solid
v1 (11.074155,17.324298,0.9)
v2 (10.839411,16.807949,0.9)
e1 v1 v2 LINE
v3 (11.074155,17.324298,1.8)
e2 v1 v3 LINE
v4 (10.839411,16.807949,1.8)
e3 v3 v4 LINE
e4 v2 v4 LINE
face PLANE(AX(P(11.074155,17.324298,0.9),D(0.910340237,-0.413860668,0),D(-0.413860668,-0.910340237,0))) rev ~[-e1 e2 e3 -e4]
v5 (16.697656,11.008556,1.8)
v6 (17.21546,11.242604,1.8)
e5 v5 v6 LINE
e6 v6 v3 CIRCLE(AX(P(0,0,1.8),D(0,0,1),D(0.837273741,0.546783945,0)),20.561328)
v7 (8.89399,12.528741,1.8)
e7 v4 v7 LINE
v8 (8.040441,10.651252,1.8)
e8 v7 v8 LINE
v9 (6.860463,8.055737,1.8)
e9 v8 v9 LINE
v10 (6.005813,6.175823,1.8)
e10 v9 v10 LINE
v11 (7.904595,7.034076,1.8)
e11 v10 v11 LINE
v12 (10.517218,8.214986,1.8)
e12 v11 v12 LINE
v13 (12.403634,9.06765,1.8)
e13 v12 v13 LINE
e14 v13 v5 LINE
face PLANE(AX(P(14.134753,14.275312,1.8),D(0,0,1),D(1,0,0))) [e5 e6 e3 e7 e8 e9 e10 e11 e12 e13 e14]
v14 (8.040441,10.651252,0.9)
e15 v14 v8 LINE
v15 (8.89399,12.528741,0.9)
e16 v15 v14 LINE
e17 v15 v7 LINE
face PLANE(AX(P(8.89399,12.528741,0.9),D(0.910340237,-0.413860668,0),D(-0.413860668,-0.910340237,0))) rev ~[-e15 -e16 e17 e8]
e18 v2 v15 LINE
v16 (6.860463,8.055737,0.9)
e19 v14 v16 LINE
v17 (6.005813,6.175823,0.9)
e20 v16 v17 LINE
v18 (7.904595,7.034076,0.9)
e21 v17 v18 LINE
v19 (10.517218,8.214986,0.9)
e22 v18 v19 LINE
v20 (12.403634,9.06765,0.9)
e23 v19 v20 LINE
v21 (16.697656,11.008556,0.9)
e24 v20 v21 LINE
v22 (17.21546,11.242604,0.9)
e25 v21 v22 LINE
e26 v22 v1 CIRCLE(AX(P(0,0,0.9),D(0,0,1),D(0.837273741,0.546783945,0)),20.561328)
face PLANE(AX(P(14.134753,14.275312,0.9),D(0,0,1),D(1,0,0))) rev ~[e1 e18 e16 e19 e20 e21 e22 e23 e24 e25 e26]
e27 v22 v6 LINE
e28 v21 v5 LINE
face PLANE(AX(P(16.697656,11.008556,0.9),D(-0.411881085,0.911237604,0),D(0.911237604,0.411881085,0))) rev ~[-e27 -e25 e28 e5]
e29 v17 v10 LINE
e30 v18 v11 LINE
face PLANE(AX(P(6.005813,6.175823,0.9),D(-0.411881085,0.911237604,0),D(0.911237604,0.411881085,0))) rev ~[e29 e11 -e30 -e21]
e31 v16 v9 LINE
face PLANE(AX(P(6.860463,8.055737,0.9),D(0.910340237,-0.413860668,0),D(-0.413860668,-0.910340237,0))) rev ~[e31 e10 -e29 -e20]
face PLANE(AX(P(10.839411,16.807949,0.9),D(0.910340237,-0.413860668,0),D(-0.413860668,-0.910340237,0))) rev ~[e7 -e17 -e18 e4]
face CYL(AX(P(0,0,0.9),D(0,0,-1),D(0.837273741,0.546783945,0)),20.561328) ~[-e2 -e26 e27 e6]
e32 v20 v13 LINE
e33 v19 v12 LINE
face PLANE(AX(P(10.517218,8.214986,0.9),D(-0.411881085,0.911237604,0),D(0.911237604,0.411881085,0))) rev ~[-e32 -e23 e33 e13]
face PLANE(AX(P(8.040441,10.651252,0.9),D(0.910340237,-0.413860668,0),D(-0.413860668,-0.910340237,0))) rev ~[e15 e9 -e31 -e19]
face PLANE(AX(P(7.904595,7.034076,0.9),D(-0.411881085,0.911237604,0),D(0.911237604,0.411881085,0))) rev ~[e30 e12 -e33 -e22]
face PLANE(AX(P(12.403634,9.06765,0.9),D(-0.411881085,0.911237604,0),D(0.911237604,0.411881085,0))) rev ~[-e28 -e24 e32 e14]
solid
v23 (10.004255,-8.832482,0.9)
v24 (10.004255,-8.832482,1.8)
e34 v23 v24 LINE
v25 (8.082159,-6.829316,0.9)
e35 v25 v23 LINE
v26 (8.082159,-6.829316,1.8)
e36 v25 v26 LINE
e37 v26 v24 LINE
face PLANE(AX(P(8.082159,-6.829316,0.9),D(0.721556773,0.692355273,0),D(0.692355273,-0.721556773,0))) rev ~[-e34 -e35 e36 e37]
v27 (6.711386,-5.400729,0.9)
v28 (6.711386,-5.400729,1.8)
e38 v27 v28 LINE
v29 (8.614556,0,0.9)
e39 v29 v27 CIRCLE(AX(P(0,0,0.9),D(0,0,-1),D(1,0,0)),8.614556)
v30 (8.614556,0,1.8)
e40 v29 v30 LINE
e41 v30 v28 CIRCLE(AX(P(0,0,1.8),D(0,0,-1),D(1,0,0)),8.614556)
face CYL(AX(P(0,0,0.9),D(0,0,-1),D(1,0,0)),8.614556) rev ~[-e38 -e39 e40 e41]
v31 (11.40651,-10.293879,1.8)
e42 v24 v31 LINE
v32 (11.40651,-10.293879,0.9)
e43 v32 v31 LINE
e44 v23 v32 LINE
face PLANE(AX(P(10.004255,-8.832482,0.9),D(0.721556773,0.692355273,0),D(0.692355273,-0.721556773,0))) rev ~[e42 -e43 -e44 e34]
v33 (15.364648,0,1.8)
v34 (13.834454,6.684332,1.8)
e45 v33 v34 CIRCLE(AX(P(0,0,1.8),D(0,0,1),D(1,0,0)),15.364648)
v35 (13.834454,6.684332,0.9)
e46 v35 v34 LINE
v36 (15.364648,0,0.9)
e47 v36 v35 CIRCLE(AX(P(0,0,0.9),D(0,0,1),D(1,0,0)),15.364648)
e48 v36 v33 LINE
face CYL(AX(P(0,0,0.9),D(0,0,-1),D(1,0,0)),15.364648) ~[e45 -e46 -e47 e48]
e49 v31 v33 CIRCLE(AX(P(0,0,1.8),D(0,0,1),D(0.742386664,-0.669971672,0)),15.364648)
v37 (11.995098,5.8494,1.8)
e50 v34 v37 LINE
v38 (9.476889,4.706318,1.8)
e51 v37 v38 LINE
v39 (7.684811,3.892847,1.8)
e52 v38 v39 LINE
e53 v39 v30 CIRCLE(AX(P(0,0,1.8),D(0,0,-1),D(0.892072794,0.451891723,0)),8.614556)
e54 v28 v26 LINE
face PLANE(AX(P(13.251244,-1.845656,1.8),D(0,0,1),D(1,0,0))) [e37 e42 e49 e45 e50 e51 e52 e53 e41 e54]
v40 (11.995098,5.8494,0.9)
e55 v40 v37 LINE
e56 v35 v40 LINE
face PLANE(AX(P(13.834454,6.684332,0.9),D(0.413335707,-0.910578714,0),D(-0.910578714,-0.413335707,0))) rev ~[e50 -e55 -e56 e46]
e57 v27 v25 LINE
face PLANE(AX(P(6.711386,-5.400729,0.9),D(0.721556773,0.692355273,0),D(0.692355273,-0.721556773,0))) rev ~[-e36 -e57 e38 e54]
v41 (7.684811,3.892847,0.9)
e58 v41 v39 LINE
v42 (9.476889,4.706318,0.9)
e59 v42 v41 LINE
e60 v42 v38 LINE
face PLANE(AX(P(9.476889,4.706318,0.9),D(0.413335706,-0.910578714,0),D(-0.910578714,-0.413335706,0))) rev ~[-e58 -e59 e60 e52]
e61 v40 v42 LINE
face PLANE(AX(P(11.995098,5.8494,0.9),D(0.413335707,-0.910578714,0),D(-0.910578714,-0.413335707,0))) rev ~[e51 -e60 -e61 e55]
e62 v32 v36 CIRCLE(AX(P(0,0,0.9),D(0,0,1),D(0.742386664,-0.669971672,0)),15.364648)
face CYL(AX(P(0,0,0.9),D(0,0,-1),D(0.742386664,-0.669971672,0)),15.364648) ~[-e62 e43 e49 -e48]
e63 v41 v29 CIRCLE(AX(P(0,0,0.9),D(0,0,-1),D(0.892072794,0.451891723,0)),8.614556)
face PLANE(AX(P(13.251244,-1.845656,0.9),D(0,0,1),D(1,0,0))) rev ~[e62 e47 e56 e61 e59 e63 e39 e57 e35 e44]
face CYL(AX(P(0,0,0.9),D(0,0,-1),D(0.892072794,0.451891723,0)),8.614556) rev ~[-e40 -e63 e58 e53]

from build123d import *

# Parameters (mm, degrees)
F0_R        = 1.5044645314
F1_DEPTH    = 2.7
F2_DEPTH    = 0.9
F3_DEPTH    = 2.7
F4_DEPTH    = 0.9
F5_T1_DEPTH = 2.7
F6_DEPTH    = 0.9


# Not quite as in the source:
# - a fillet or chamfer that OpenCascade refuses, or shapes differently, is made with other operations: its cross-section is extruded or revolved along the edge and cut away or added


with BuildPart() as f1:
    # F0 (on Top) → F1 (new body)
    with BuildSketch(Plane.XY):
        with BuildLine():
            ThreePointArc((-2.9059050305, 19.7877668258), (-18.361479671, -7.928181651), (12.4102011034, -15.6839697964))
            Line((12.4102011034, -15.6839697964), (9.3065271924, -12.2254227754))
            ThreePointArc((9.3065271924, -12.2254227754), (-15.2699304913, -1.7034180964), (6.3836906961, 13.9757255095))
            Line((6.3836906961, 13.9757255095), (8.1864677167, 18.2477874364))
            ThreePointArc((8.1864677167, 18.2477874364), (5.5993809855, 19.2001805351), (2.9059050305, 19.7877668258))
            ThreePointArc((2.9059050305, 19.7877668258), (0, 18.1241204417), (-2.9059050305, 19.7877668258))
        make_face()
        with BuildLine():
            ThreePointArc((6.3836906961, 13.9757255095), (-15.2699304913, -1.7034180964), (9.3065271924, -12.2254227754))
            Line((9.3065271924, -12.2254227754), (7.9527661976, -10.7168731694))
            ThreePointArc((7.9527661976, -10.7168731694), (-13.2749249311, -1.3690247612), (5.5982117915, 12.114366903))
            Line((5.5982117915, 12.114366903), (6.3836906961, 13.9757255095))
        make_face()
        with BuildLine():
            ThreePointArc((5.5982117915, 12.114366903), (-13.2749249311, -1.3690247612), (7.9527661976, -10.7168731694))
            Line((7.9527661976, -10.7168731694), (6.0964799797, -8.6483397626))
            ThreePointArc((6.0964799797, -8.6483397626), (-10.5418803683, -0.9108276969), (4.5227579261, 9.5658512185))
            Line((4.5227579261, 9.5658512185), (5.5982117915, 12.114366903))
        make_face()
        with BuildLine():
            ThreePointArc((4.5227579261, 9.5658512185), (-10.5418803683, -0.9108276969), (6.0964799797, -8.6483397626))
            Line((6.0964799797, -8.6483397626), (4.7718042528, -7.1722010249))
            ThreePointArc((4.7718042528, -7.1722010249), (-8.5947223482, -0.5842355063), (3.7573171653, 7.7519772374))
            Line((3.7573171653, 7.7519772374), (4.5227579261, 9.5658512185))
        make_face()
        with BuildLine():
            ThreePointArc((3.7573171653, 7.7519772374), (-8.5947223482, -0.5842355063), (4.7718042528, -7.1722010249))
            Line((4.7718042528, -7.1722010249), (1.6593857385, -3.7039095455))
            ThreePointArc((1.6593857385, -3.7039095455), (-4.0546444127, 0.1799045205), (1.9809039535, 3.5423899386))
            Line((1.9809039535, 3.5423899386), (3.7573171653, 7.7519772374))
        make_face()
        with BuildLine():
            ThreePointArc((2.9059050305, 19.7877668258), (0, 20), (-2.9059050305, 19.7877668258))
            ThreePointArc((-2.9059050305, 19.7877668258), (0, 18.1241204417), (2.9059050305, 19.7877668258))
        make_face()
        with BuildLine():
            ThreePointArc((-3.157685128, 20.3174125427), (-3.043339046, 20.0471019762), (-2.9059050305, 19.7877668258))
            ThreePointArc((-2.9059050305, 19.7877668258), (0, 20), (2.9059050305, 19.7877668258))
            ThreePointArc((2.9059050305, 19.7877668258), (3.043339046, 20.0471019762), (3.157685128, 20.3174125427))
            ThreePointArc((3.157685128, 20.3174125427), (0, 20.5613284541), (-3.157685128, 20.3174125427))
        make_face()
        with BuildLine():
            ThreePointArc((3.3697074825, 21.4938279241), (-0.5976844127, 24.8101062388), (-3.157685128, 20.3174125427))
            ThreePointArc((-3.157685128, 20.3174125427), (0, 20.5613284541), (3.157685128, 20.3174125427))
            ThreePointArc((3.157685128, 20.3174125427), (3.3162783146, 20.8961435115), (3.3697074825, 21.4938279241))
        make_face()
        with Locations((0, 22.4330537021)):
            Circle(F0_R, mode=Mode.SUBTRACT)
        with BuildLine():
            ThreePointArc((13.8344540426, 6.6843318112), (13.1730545976, 7.9084159596), (12.4036340143, 9.0676498421))
            Line((12.4036340143, 9.0676498421), (10.5172175152, 8.21498609))
            ThreePointArc((10.5172175152, 8.21498609), (11.318131065, 7.0709101194), (11.995098321, 5.8493997121))
            Line((11.995098321, 5.8493997121), (13.8344540426, 6.6843318112))
        make_face()
        with BuildLine():
            ThreePointArc((11.995098321, 5.8493997121), (11.318131065, 7.0709101194), (10.5172175152, 8.21498609))
            Line((10.5172175152, 8.21498609), (7.9045951482, 7.0340759404))
            ThreePointArc((7.9045951482, 7.0340759404), (8.7683299388, 5.9226040621), (9.4768887451, 4.706317935))
            Line((9.4768887451, 4.706317935), (11.995098321, 5.8493997121))
        make_face()
        with BuildLine():
            ThreePointArc((9.4768887451, 4.706317935), (8.7683299388, 5.9226040621), (7.9045951482, 7.0340759404))
            Line((7.9045951482, 7.0340759404), (6.0058132946, 6.1758230253))
            ThreePointArc((6.0058132946, 6.1758230253), (6.9398340598, 5.1038501734), (7.6848114732, 3.8928467719))
            Line((7.6848114732, 3.8928467719), (9.4768887451, 4.706317935))
        make_face()
        with BuildLine():
            Line((6.0058132946, 6.1758230253), (7.9045951482, 7.0340759404))
            ThreePointArc((7.9045951482, 7.0340759404), (7.4001814409, 7.5629467428), (6.8604632985, 8.0557365971))
            Line((6.8604632985, 8.0557365971), (6.0058132946, 6.1758230253))
        make_face()
        with BuildLine():
            ThreePointArc((6.8604632985, 8.0557365971), (5.7414756731, 8.8879866049), (4.5227579261, 9.5658512185))
            Line((4.5227579261, 9.5658512185), (3.7573171653, 7.7519772374))
            ThreePointArc((3.7573171653, 7.7519772374), (4.9447694202, 7.0540654058), (6.0058132946, 6.1758230253))
            Line((6.0058132946, 6.1758230253), (6.8604632985, 8.0557365971))
        make_face()
        with BuildLine():
            ThreePointArc((8.0404414582, 10.6512516579), (6.8584540657, 11.4481207432), (5.5982117915, 12.114366903))
            Line((5.5982117915, 12.114366903), (4.5227579261, 9.5658512185))
            ThreePointArc((4.5227579261, 9.5658512185), (5.7414756731, 8.8879866049), (6.8604632985, 8.0557365971))
            Line((6.8604632985, 8.0557365971), (8.0404414582, 10.6512516579))
        make_face()
        with BuildLine():
            ThreePointArc((8.8939895289, 12.5287413845), (7.6730254156, 13.3115397829), (6.3836906961, 13.9757255095))
            Line((6.3836906961, 13.9757255095), (5.5982117915, 12.114366903))
            ThreePointArc((5.5982117915, 12.114366903), (6.8584540657, 11.4481207432), (8.0404414582, 10.6512516579))
            Line((8.0404414582, 10.6512516579), (8.8939895289, 12.5287413845))
        make_face()
        with BuildLine():
            Line((7.9045951482, 7.0340759404), (10.5172175152, 8.21498609))
            ThreePointArc((10.5172175152, 8.21498609), (9.3584466725, 9.514059943), (8.0404414582, 10.6512516579))
            Line((8.0404414582, 10.6512516579), (6.8604632985, 8.0557365971))
            ThreePointArc((6.8604632985, 8.0557365971), (7.4001814409, 7.5629467428), (7.9045951482, 7.0340759404))
        make_face()
        with BuildLine():
            Line((10.5172175152, 8.21498609), (12.4036340143, 9.0676498421))
            ThreePointArc((12.4036340143, 9.0676498421), (10.7885115198, 10.9398550999), (8.8939895289, 12.5287413845))
            Line((8.8939895289, 12.5287413845), (8.0404414582, 10.6512516579))
            ThreePointArc((8.0404414582, 10.6512516579), (9.3584466725, 9.514059943), (10.5172175152, 8.21498609))
        make_face()
        with BuildLine():
            Line((12.4036340143, 9.0676498421), (16.6976556484, 11.008555575))
            ThreePointArc((16.6976556484, 11.008555575), (14.070563524, 14.2133473227), (10.8394114429, 16.807949297))
            Line((10.8394114429, 16.807949297), (8.8939895289, 12.5287413845))
            ThreePointArc((8.8939895289, 12.5287413845), (10.7885115198, 10.9398550999), (12.4036340143, 9.0676498421))
        make_face()
        with BuildLine():
            ThreePointArc((10.8394114429, 16.807949297), (14.070563524, 14.2133473227), (16.6976556484, 11.008555575))
            Line((16.6976556484, 11.008555575), (17.2154603994, 11.2426042817))
            ThreePointArc((17.2154603994, 11.2426042817), (14.4679762691, 14.6097874889), (11.0741551061, 17.3242984413))
            Line((11.0741551061, 17.3242984413), (10.8394114429, 16.807949297))
        make_face()
    extrude(amount=-F1_DEPTH)

    # F0 (on Top) → F2 (join)
    with BuildSketch(Plane.XY):
        with BuildLine():
            ThreePointArc((-2.9059050305, 19.7877668258), (-18.361479671, -7.928181651), (12.4102011034, -15.6839697964))
            Line((12.4102011034, -15.6839697964), (9.3065271924, -12.2254227754))
            ThreePointArc((9.3065271924, -12.2254227754), (-15.2699304913, -1.7034180964), (6.3836906961, 13.9757255095))
            Line((6.3836906961, 13.9757255095), (8.1864677167, 18.2477874364))
            ThreePointArc((8.1864677167, 18.2477874364), (5.5993809855, 19.2001805351), (2.9059050305, 19.7877668258))
            ThreePointArc((2.9059050305, 19.7877668258), (0, 18.1241204417), (-2.9059050305, 19.7877668258))
        make_face()
        with BuildLine():
            ThreePointArc((6.3836906961, 13.9757255095), (-15.2699304913, -1.7034180964), (9.3065271924, -12.2254227754))
            Line((9.3065271924, -12.2254227754), (7.9527661976, -10.7168731694))
            ThreePointArc((7.9527661976, -10.7168731694), (-13.2749249311, -1.3690247612), (5.5982117915, 12.114366903))
            Line((5.5982117915, 12.114366903), (6.3836906961, 13.9757255095))
        make_face()
        with BuildLine():
            ThreePointArc((4.5227579261, 9.5658512185), (-10.5418803683, -0.9108276969), (6.0964799797, -8.6483397626))
            Line((6.0964799797, -8.6483397626), (4.7718042528, -7.1722010249))
            ThreePointArc((4.7718042528, -7.1722010249), (-8.5947223482, -0.5842355063), (3.7573171653, 7.7519772374))
            Line((3.7573171653, 7.7519772374), (4.5227579261, 9.5658512185))
        make_face()
        with BuildLine():
            ThreePointArc((3.7573171653, 7.7519772374), (-8.5947223482, -0.5842355063), (4.7718042528, -7.1722010249))
            Line((4.7718042528, -7.1722010249), (1.6593857385, -3.7039095455))
            ThreePointArc((1.6593857385, -3.7039095455), (-4.0546444127, 0.1799045205), (1.9809039535, 3.5423899386))
            Line((1.9809039535, 3.5423899386), (3.7573171653, 7.7519772374))
        make_face()
        with BuildLine():
            ThreePointArc((2.9059050305, 19.7877668258), (0, 20), (-2.9059050305, 19.7877668258))
            ThreePointArc((-2.9059050305, 19.7877668258), (0, 18.1241204417), (2.9059050305, 19.7877668258))
        make_face()
    extrude(amount=F2_DEPTH)

    # F0 (on Top) → F3 (join)
    with BuildSketch(Plane.XY):
        with BuildLine():
            Line((6.7113864418, -5.4007291543), (8.0821585416, -6.8293163715))
            ThreePointArc((8.0821585416, -6.8293163715), (9.9367857977, -3.6360881181), (10.5811553619, 0))
            ThreePointArc((10.5811553619, 0), (10.3013902205, 2.4170660555), (9.4768887451, 4.706317935))
            Line((9.4768887451, 4.706317935), (7.6848114732, 3.8928467719))
            ThreePointArc((7.6848114732, 3.8928467719), (8.3788968801, 2.00116727), (8.6145564813, 0))
            ThreePointArc((8.6145564813, 0), (8.1248446428, -2.8631246741), (6.7113864418, -5.4007291543))
        make_face()
        with BuildLine():
            Line((8.0821585416, -6.8293163715), (10.0042554899, -8.8324816906))
            ThreePointArc((10.0042554899, -8.8324816906), (12.4821464921, -4.721639511), (13.3453310458, 0))
            ThreePointArc((13.3453310458, 0), (13.0033922255, 3.0016081275), (11.995098321, 5.8493997121))
            Line((11.995098321, 5.8493997121), (9.4768887451, 4.706317935))
            ThreePointArc((9.4768887451, 4.706317935), (10.3013902205, 2.4170660555), (10.5811553619, 0))
            ThreePointArc((10.5811553619, 0), (9.9367857977, -3.6360881181), (8.0821585416, -6.8293163715))
        make_face()
        with BuildLine():
            Line((10.0042554899, -8.8324816906), (11.4065098197, -10.2938789654))
            ThreePointArc((11.4065098197, -10.2938789654), (14.3410149492, -5.5143177862), (15.3646480734, 0))
            ThreePointArc((15.3646480734, 0), (14.9772148291, 3.4286216448), (13.8344540426, 6.6843318112))
            Line((13.8344540426, 6.6843318112), (11.995098321, 5.8493997121))
            ThreePointArc((11.995098321, 5.8493997121), (13.0033922255, 3.0016081275), (13.3453310458, 0))
            ThreePointArc((13.3453310458, 0), (12.4821464921, -4.721639511), (10.0042554899, -8.8324816906))
        make_face()
        with BuildLine():
            Line((7.9527661976, -10.7168731694), (9.3065271924, -12.2254227754))
            ThreePointArc((9.3065271924, -12.2254227754), (10.4014513861, -11.3085020883), (11.4065098197, -10.2938789654))
            Line((11.4065098197, -10.2938789654), (10.0042554899, -8.8324816906))
            ThreePointArc((10.0042554899, -8.8324816906), (9.0278120152, -9.8283503672), (7.9527661976, -10.7168731694))
        make_face()
        with BuildLine():
            Line((6.0964799797, -8.6483397626), (7.9527661976, -10.7168731694))
            ThreePointArc((7.9527661976, -10.7168731694), (9.0278120152, -9.8283503672), (10.0042554899, -8.8324816906))
            Line((10.0042554899, -8.8324816906), (8.0821585416, -6.8293163715))
            ThreePointArc((8.0821585416, -6.8293163715), (7.1474232492, -7.8022554232), (6.0964799797, -8.6483397626))
        make_face()
        with BuildLine():
            Line((4.7718042528, -7.1722010249), (6.0964799797, -8.6483397626))
            ThreePointArc((6.0964799797, -8.6483397626), (7.1474232492, -7.8022554232), (8.0821585416, -6.8293163715))
            Line((8.0821585416, -6.8293163715), (6.7113864418, -5.4007291543))
            ThreePointArc((6.7113864418, -5.4007291543), (5.8095133427, -6.3608284122), (4.7718042528, -7.1722010249))
        make_face()
    extrude(amount=-F3_DEPTH)

    # F0 (on Top) → F4 (join)
    with BuildSketch(Plane.XY):
        with BuildLine():
            Line((10.0042554899, -8.8324816906), (11.4065098197, -10.2938789654))
            ThreePointArc((11.4065098197, -10.2938789654), (14.3410149492, -5.5143177862), (15.3646480734, 0))
            ThreePointArc((15.3646480734, 0), (14.9772148291, 3.4286216448), (13.8344540426, 6.6843318112))
            Line((13.8344540426, 6.6843318112), (11.995098321, 5.8493997121))
            ThreePointArc((11.995098321, 5.8493997121), (13.0033922255, 3.0016081275), (13.3453310458, 0))
            ThreePointArc((13.3453310458, 0), (12.4821464921, -4.721639511), (10.0042554899, -8.8324816906))
        make_face()
        with BuildLine():
            Line((8.0821585416, -6.8293163715), (10.0042554899, -8.8324816906))
            ThreePointArc((10.0042554899, -8.8324816906), (12.4821464921, -4.721639511), (13.3453310458, 0))
            ThreePointArc((13.3453310458, 0), (13.0033922255, 3.0016081275), (11.995098321, 5.8493997121))
            Line((11.995098321, 5.8493997121), (9.4768887451, 4.706317935))
            ThreePointArc((9.4768887451, 4.706317935), (10.3013902205, 2.4170660555), (10.5811553619, 0))
            ThreePointArc((10.5811553619, 0), (9.9367857977, -3.6360881181), (8.0821585416, -6.8293163715))
        make_face()
        with BuildLine():
            Line((6.7113864418, -5.4007291543), (8.0821585416, -6.8293163715))
            ThreePointArc((8.0821585416, -6.8293163715), (9.9367857977, -3.6360881181), (10.5811553619, 0))
            ThreePointArc((10.5811553619, 0), (10.3013902205, 2.4170660555), (9.4768887451, 4.706317935))
            Line((9.4768887451, 4.706317935), (7.6848114732, 3.8928467719))
            ThreePointArc((7.6848114732, 3.8928467719), (8.3788968801, 2.00116727), (8.6145564813, 0))
            ThreePointArc((8.6145564813, 0), (8.1248446428, -2.8631246741), (6.7113864418, -5.4007291543))
        make_face()
        with BuildLine():
            ThreePointArc((10.8394114429, 16.807949297), (14.070563524, 14.2133473227), (16.6976556484, 11.008555575))
            Line((16.6976556484, 11.008555575), (17.2154603994, 11.2426042817))
            ThreePointArc((17.2154603994, 11.2426042817), (14.4679762691, 14.6097874889), (11.0741551061, 17.3242984413))
            Line((11.0741551061, 17.3242984413), (10.8394114429, 16.807949297))
        make_face()
        with BuildLine():
            Line((6.0058132946, 6.1758230253), (7.9045951482, 7.0340759404))
            ThreePointArc((7.9045951482, 7.0340759404), (7.4001814409, 7.5629467428), (6.8604632985, 8.0557365971))
            Line((6.8604632985, 8.0557365971), (6.0058132946, 6.1758230253))
        make_face()
        with BuildLine():
            Line((7.9045951482, 7.0340759404), (10.5172175152, 8.21498609))
            ThreePointArc((10.5172175152, 8.21498609), (9.3584466725, 9.514059943), (8.0404414582, 10.6512516579))
            Line((8.0404414582, 10.6512516579), (6.8604632985, 8.0557365971))
            ThreePointArc((6.8604632985, 8.0557365971), (7.4001814409, 7.5629467428), (7.9045951482, 7.0340759404))
        make_face()
        with BuildLine():
            Line((10.5172175152, 8.21498609), (12.4036340143, 9.0676498421))
            ThreePointArc((12.4036340143, 9.0676498421), (10.7885115198, 10.9398550999), (8.8939895289, 12.5287413845))
            Line((8.8939895289, 12.5287413845), (8.0404414582, 10.6512516579))
            ThreePointArc((8.0404414582, 10.6512516579), (9.3584466725, 9.514059943), (10.5172175152, 8.21498609))
        make_face()
        with BuildLine():
            Line((12.4036340143, 9.0676498421), (16.6976556484, 11.008555575))
            ThreePointArc((16.6976556484, 11.008555575), (14.070563524, 14.2133473227), (10.8394114429, 16.807949297))
            Line((10.8394114429, 16.807949297), (8.8939895289, 12.5287413845))
            ThreePointArc((8.8939895289, 12.5287413845), (10.7885115198, 10.9398550999), (12.4036340143, 9.0676498421))
        make_face()
    extrude(amount=F4_DEPTH)

    # F5: fillet of radius 3 on 2 edges, made by hand

    # F5_s2 → F5_t1 (join)
    with BuildSketch(Plane.XY.offset(-2.7)):
        with BuildLine():
            ThreePointArc((3.3539587166, 21.8192345075), (4.0340965589, 20.1897997022), (5.5129894146, 19.2251644392))
            ThreePointArc((5.5129894146, 19.2251644392), (4.2188358916, 19.5499724736), (2.9059050305, 19.7877668258))
            ThreePointArc((2.9059050305, 19.7877668258), (3.2906213347, 20.768059539), (3.3539587166, 21.8192345075))
        make_face()
        with BuildLine():
            ThreePointArc((-3.3539587166, 21.8192345075), (-4.0340965589, 20.1897997022), (-5.5129894146, 19.2251644392))
            ThreePointArc((-5.5129894146, 19.2251644392), (-4.2188358916, 19.5499724736), (-2.9059050305, 19.7877668258))
            ThreePointArc((-2.9059050305, 19.7877668258), (-3.2906213347, 20.768059539), (-3.3539587166, 21.8192345075))
        make_face()
    extrude(amount=F5_T1_DEPTH)


with BuildPart() as f6:
    # F6 (new): a face of the model
    f6_faces = [f1.part.faces().sort_by_distance(p)[0] for p in [
        (11.5302934708, -1.5094822973, 0.9),
    ]]
    extrude(f6_faces, amount=F6_DEPTH)


with BuildPart() as f6b:
    # F6#2 (new): a face of the model
    f6_2_faces = [f1.part.faces().sort_by_distance(p)[0] for p in [
        (11.5759648362, 11.7245978836, 0.9),
    ]]
    extrude(f6_2_faces, amount=F6_DEPTH)


solid = Compound([f6.part, f6b.part])
